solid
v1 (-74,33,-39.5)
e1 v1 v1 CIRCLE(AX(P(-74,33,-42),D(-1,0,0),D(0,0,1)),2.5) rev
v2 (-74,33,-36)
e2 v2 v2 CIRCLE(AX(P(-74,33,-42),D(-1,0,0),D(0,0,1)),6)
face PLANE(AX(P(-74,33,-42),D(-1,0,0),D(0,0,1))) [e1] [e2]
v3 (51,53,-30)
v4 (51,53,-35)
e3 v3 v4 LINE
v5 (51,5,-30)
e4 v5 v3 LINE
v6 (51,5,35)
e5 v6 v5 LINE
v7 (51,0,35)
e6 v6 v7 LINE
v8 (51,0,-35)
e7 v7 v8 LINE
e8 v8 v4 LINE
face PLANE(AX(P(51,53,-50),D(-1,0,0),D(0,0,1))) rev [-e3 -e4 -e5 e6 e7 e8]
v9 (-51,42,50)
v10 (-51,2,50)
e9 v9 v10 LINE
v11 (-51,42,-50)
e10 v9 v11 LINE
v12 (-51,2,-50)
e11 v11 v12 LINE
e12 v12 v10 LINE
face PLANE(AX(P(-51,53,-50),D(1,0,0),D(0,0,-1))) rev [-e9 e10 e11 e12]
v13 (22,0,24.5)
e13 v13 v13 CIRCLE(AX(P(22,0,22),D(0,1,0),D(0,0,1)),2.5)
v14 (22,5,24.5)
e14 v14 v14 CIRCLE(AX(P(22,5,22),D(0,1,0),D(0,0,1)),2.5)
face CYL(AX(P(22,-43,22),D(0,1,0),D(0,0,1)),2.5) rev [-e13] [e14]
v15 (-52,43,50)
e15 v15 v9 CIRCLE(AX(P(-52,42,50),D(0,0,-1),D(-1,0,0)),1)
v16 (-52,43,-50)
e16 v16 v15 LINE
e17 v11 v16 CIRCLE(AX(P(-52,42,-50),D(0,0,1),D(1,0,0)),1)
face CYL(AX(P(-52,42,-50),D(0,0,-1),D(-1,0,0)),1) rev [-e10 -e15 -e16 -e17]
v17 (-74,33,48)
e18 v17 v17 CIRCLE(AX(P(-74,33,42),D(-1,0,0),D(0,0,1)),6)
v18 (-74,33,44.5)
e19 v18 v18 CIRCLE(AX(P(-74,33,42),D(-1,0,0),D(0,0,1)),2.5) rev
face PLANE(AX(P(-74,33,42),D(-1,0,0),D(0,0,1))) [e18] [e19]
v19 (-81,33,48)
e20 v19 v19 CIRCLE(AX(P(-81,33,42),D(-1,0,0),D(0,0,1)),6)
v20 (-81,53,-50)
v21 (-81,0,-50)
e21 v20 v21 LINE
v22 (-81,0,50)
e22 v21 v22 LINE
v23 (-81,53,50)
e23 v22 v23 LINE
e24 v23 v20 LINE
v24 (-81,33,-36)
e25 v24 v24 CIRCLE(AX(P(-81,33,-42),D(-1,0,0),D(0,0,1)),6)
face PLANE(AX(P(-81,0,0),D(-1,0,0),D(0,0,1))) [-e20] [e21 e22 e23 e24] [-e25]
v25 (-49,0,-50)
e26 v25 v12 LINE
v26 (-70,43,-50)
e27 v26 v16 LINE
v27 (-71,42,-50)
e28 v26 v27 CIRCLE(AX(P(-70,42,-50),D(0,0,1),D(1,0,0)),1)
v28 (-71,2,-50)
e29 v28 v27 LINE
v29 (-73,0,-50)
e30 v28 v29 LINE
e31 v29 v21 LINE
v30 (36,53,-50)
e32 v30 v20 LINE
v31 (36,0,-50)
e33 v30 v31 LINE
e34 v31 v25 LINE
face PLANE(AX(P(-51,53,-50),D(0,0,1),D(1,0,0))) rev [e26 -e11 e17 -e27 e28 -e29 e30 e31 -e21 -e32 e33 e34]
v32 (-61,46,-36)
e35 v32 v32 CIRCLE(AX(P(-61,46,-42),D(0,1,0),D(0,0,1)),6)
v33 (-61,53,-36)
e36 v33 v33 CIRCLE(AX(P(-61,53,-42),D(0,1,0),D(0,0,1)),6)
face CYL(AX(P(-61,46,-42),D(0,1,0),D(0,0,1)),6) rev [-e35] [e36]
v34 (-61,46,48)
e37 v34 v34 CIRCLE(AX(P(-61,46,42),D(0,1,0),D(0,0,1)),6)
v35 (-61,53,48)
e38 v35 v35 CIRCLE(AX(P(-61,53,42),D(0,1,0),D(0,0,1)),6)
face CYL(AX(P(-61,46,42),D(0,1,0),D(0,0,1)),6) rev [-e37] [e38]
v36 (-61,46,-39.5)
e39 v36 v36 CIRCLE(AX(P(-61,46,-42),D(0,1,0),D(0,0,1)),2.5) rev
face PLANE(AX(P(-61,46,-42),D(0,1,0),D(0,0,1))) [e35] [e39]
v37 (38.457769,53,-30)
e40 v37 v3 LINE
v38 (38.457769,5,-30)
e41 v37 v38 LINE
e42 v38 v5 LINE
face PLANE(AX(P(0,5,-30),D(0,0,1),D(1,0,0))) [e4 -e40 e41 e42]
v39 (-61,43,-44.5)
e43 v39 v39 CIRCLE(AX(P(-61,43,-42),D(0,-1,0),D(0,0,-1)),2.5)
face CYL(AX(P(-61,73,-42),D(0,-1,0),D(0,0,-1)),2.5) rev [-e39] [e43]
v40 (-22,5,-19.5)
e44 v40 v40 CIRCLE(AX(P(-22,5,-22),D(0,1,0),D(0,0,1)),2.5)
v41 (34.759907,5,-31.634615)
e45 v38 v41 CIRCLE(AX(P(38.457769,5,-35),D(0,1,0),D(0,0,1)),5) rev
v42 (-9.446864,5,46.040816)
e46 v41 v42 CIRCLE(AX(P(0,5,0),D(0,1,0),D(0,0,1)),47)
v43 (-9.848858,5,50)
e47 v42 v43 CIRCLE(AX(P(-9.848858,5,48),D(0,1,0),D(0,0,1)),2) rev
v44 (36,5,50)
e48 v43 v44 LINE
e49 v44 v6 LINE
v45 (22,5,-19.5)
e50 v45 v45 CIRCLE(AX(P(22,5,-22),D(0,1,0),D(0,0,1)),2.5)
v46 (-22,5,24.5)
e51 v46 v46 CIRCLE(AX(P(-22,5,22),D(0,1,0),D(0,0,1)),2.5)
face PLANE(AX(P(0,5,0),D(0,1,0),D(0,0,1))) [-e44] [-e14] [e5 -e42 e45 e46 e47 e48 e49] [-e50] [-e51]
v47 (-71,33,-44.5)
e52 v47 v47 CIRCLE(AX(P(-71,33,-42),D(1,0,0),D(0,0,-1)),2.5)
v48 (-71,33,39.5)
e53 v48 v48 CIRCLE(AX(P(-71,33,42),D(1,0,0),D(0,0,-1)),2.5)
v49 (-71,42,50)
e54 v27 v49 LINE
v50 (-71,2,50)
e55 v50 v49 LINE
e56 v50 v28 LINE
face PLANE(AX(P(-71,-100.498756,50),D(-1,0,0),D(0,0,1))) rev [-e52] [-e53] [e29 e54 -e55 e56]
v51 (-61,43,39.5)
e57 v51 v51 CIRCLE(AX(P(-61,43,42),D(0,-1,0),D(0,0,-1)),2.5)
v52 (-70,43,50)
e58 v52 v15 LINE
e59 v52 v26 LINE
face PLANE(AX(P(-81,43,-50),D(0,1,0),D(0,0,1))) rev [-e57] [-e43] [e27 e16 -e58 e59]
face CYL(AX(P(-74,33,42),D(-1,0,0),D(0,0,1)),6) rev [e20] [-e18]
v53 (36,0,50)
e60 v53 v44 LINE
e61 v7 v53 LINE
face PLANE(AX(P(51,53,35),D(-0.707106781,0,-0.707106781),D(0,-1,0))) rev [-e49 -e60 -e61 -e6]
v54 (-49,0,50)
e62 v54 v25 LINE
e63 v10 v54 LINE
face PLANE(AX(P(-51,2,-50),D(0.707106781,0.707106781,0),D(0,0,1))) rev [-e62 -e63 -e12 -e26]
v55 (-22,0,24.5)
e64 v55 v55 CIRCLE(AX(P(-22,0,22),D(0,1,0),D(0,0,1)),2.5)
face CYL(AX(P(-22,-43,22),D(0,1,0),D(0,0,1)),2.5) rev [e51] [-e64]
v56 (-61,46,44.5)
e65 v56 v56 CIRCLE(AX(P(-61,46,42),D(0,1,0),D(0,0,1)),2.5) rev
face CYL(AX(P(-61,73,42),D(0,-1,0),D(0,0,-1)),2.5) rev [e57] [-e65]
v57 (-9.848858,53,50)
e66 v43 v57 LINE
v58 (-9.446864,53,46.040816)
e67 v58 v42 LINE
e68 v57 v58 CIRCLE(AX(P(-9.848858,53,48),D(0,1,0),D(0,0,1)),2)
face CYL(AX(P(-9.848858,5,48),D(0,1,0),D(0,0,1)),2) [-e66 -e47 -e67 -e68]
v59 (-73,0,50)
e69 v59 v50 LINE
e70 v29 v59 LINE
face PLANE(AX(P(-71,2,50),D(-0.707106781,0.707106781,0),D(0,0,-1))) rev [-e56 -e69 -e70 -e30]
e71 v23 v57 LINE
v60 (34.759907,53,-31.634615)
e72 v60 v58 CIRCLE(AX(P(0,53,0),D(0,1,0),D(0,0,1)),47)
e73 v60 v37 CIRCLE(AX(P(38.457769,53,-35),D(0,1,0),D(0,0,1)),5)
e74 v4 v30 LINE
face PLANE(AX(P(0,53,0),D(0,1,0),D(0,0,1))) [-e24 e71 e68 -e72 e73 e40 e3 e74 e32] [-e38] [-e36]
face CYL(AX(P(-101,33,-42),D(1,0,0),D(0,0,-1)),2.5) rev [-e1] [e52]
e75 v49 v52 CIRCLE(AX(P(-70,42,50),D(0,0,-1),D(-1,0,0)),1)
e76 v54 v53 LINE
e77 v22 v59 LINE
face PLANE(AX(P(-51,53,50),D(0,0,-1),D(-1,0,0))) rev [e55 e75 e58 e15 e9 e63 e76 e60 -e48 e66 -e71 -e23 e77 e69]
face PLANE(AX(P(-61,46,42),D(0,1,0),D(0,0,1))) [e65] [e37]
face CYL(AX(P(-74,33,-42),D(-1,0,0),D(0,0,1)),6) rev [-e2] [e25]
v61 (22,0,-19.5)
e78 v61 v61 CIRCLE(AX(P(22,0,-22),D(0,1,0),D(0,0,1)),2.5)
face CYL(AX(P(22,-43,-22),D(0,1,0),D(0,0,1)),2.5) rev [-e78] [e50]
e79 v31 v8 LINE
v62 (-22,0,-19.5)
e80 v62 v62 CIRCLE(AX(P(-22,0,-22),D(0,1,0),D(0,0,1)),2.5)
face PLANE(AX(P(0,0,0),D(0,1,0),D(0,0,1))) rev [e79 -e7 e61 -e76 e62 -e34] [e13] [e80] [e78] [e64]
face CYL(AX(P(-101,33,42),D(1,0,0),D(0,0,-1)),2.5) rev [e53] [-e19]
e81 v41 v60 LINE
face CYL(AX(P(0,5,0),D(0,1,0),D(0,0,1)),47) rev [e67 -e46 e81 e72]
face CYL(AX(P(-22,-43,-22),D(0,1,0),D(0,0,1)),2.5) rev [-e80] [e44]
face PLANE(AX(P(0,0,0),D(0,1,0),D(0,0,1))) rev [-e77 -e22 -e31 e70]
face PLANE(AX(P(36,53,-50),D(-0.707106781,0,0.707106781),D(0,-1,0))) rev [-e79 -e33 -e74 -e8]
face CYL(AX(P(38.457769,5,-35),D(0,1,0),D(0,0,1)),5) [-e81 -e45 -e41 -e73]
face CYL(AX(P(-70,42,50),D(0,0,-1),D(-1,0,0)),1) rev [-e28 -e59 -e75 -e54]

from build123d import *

# Parameters (mm, degrees)
SKETCH_1_W          = 102
SKETCH_1_H          = 100
EXTRUDE_1_DEPTH     = 53
CUT_EXTRUDE_1_DEPTH = 48
SKETCH_3_W          = 51
SKETCH_3_H          = 50
CUT_EXTRUDE_2_DEPTH = 48
CUT_EXTRUDE_3_DEPTH = 48
CHAMFER_1_SIZE      = 15
FILLET_2_R          = 5
SKETCH_5_W          = 100
SKETCH_5_H          = 10
EXTRUDE_2_DEPTH     = 30
SKETCH_6_W          = 10
SKETCH_6_H          = 100
EXTRUDE_3_DEPTH     = 43
FILLET_START        = 5
FILLET_5_DEPTH      = 49
SKETCH_8_R          = 2.5
CUT_EXTRUDE_4_DEPTH = 30
SKETCH_9_R          = 6
CUT_EXTRUDE_5_DEPTH = 7
SKETCH_10_R         = 2.5
CUT_EXTRUDE_6_DEPTH = 30
SKETCH_11_R         = 6
CUT_EXTRUDE_7_DEPTH = 7
CHAMFER_2_SIZE      = 2
FILLET_7_R          = 1


with BuildPart() as part:
    # 草图1 → 凸台-拉伸1 (new body)
    with BuildSketch(Plane(origin=(0, 0, 0), x_dir=(1, 0, 0), z_dir=(0, 1, 0))):
        Rectangle(SKETCH_1_W, SKETCH_1_H)
    extrude(amount=EXTRUDE_1_DEPTH)

    # 草图2 → 切除-拉伸1 (cut)
    with BuildSketch(Plane(origin=(0, 53, 0), x_dir=(1, 0, 0), z_dir=(0, 1, 0))):
        with BuildLine():
            Line((23, -30), (23, 30))
            Line((23, 30), (36.18010503, 30))
            ThreePointArc((36.18010503, 30), (-47, 0), (36.18010503, -30))
            Line((36.18010503, -30), (23, -30))
        make_face()
        with BuildLine():
            Line((36.18010503, 30), (23, 30))
            Line((23, 30), (23, -30))
            Line((23, -30), (36.18010503, -30))
            ThreePointArc((36.18010503, -30), (44.21235651, -15.94576846), (47, 0))
            ThreePointArc((47, 0), (44.21235651, 15.94576846), (36.18010503, 30))
        make_face()
        with BuildLine():
            Line((51, 30), (36.18010503, 30))
            ThreePointArc((36.18010503, 30), (44.21235651, 15.94576846), (47, 0))
            ThreePointArc((47, 0), (44.21235651, -15.94576846), (36.18010503, -30))
            Line((36.18010503, -30), (51, -30))
            Line((51, -30), (51, 30))
        make_face()
    extrude(amount=-CUT_EXTRUDE_1_DEPTH, mode=Mode.SUBTRACT)

    # 草图3 → 切除-拉伸2 (cut)
    with BuildSketch(Plane(origin=(0, 53, 0), x_dir=(1, 0, 0), z_dir=(0, 1, 0))):
        with Locations((25.5, -25)):
            Rectangle(SKETCH_3_W, SKETCH_3_H)
    extrude(amount=-CUT_EXTRUDE_2_DEPTH, mode=Mode.SUBTRACT)

    # 草图4 → 切除-拉伸3 (cut)
    with BuildSketch(Plane(origin=(0, 5, 0), x_dir=(1, 0, 0), z_dir=(0, 1, 0))):
        with BuildLine():
            ThreePointArc((24.5, 22), (22, 24.5), (19.5, 22))
            Line((19.5, 22), (22, 22))
            Line((22, 22), (22, 19.5))
            ThreePointArc((22, 19.5), (23.767766953, 20.232233047), (24.5, 22))
        make_face()
        with BuildLine():
            Line((22, 22), (19.5, 22))
            ThreePointArc((19.5, 22), (20.232233047, 20.232233047), (22, 19.5))
            Line((22, 19.5), (22, 22))
        make_face()
        with BuildLine():
            Line((-22, 19.5), (-22, 22))
            Line((-22, 22), (-19.5, 22))
            ThreePointArc((-19.5, 22), (-23.767766953, 23.767766953), (-22, 19.5))
        make_face()
        with BuildLine():
            Line((-19.5, 22), (-22, 22))
            Line((-22, 22), (-22, 19.5))
            ThreePointArc((-22, 19.5), (-20.232233047, 20.232233047), (-19.5, 22))
        make_face()
        with BuildLine():
            ThreePointArc((-19.5, -22), (-20.232233047, -20.232233047), (-22, -19.5))
            Line((-22, -19.5), (-22, -22))
            Line((-22, -22), (-19.5, -22))
        make_face()
        with BuildLine():
            Line((-22, -22), (-22, -19.5))
            ThreePointArc((-22, -19.5), (-23.767766953, -23.767766953), (-19.5, -22))
            Line((-19.5, -22), (-22, -22))
        make_face()
        with BuildLine():
            ThreePointArc((24.5, -22), (23.767766953, -20.232233047), (22, -19.5))
            Line((22, -19.5), (22, -22))
            Line((22, -22), (19.5, -22))
            ThreePointArc((19.5, -22), (22, -24.5), (24.5, -22))
        make_face()
        with BuildLine():
            Line((22, -22), (22, -19.5))
            ThreePointArc((22, -19.5), (20.232233047, -20.232233047), (19.5, -22))
            Line((19.5, -22), (22, -22))
        make_face()
    extrude(amount=-CUT_EXTRUDE_3_DEPTH, mode=Mode.SUBTRACT)

    # 倒角1
    chamfer_1_edges = [part.edges().sort_by_distance(p)[0] for p in [
        (51, 2.5, 50),
        (51, 26.5, -50),
    ]]
    chamfer(chamfer_1_edges, length=CHAMFER_1_SIZE)

    # 圆角2
    # the kernel refuses this fillet: 5 mm, written as the material it takes off along each edge
    with BuildSketch(Plane(origin=(0, 5, 47), x_dir=(-0.9989898744385596, 0, -0.0449358517136451), z_dir=(0, 1, 0))) as fillet_2_piece_1:
        with BuildLine():
            CenterArc((4.44864932, 4.994949372), FILLET_2_R, 203.55292178, 63.871576317)
            Line((-0.134807555, 2.996969623), (0, 0))
            ThreePointArc((0, 0), (2.111985031, 0.047475901), (4.223970061, 0))
        make_face()
    extrude(amount=58.559925153, mode=Mode.SUBTRACT)
    with BuildSketch(Plane(origin=(36.18010503, 58.69416004, -30), x_dir=(1, 0, 0), z_dir=(0, -1, 0))) as fillet_2_piece_2:
        with BuildLine():
            CenterArc((2.277664016, -5), FILLET_2_R, 90, 47.695010293)
            ThreePointArc((-1.420198392, -1.634615385), (-0.700684154, -0.825487738), (0, 0))
            Line((0, 0), (2.277664016, 0))
        make_face()
    extrude(amount=53.69416004, mode=Mode.SUBTRACT)

    # 草图5 → 凸台-拉伸2 (add)
    with BuildSketch(Plane.ZY.offset(51)):
        with Locations((0, 48)):
            Rectangle(SKETCH_5_W, SKETCH_5_H)
    extrude(amount=EXTRUDE_2_DEPTH)

    # 草图6 → 凸台-拉伸3 (add)
    with BuildSketch(Plane.XZ.offset(-43)):
        with Locations((-76, 0)):
            Rectangle(SKETCH_6_W, SKETCH_6_H)
    extrude(amount=EXTRUDE_3_DEPTH)

    # 圆角5: read off the stored shape, not the designer's step
    # 圆角5 outline → 圆角5 (cut)
    with BuildSketch(Plane(origin=(0, 0, 0), x_dir=(1, 0, 0), z_dir=(0, 1, 0)).offset(FILLET_START)):
        with BuildLine():
            ThreePointArc((-9.446863606, -46.040816327), (-7.859088048, -48.202030509), (-9.848857802, -50))
            Line((-9.848857802, -50), (0, -50))
            ThreePointArc((0, -50), (-1.653487381, -47.801385193), (-4.219703321, -46.810192308))
            ThreePointArc((-4.219703321, -46.810192308), (-6.844103136, -46.499013455), (-9.446863606, -46.040816327))
        make_face()
    extrude(amount=FILLET_5_DEPTH, mode=Mode.SUBTRACT)

    # 草图8 → 切除-拉伸4 (cut)
    with BuildSketch(Plane.XZ.offset(-43)):
        with Locations(Location((-61, 42, 0), (0, 0, 270))):
            Circle(SKETCH_8_R)
        with Locations(Location((-61, -42, 0), (0, 0, 270))):
            Circle(SKETCH_8_R)
    extrude(amount=-CUT_EXTRUDE_4_DEPTH, mode=Mode.SUBTRACT)

    # 草图9 → 切除-拉伸5 (cut)
    with BuildSketch(Plane(origin=(0, 53, 0), x_dir=(1, 0, 0), z_dir=(0, 1, 0))):
        with Locations(Location((-61, 42, 0), (0, 0, 270))):
            Circle(SKETCH_9_R)
        with Locations(Location((-61, -42, 0), (0, 0, 270))):
            Circle(SKETCH_9_R)
    extrude(amount=-CUT_EXTRUDE_5_DEPTH, mode=Mode.SUBTRACT)

    # 草图10 → 切除-拉伸6 (cut)
    with BuildSketch(Plane(origin=(-71, 0, 0), x_dir=(0, 0, -1), z_dir=(1, 0, 0))):
        with Locations((-42, 33)):
            Circle(SKETCH_10_R)
        with Locations((42, 33)):
            Circle(SKETCH_10_R)
    extrude(amount=-CUT_EXTRUDE_6_DEPTH, mode=Mode.SUBTRACT)

    # 草图11 → 切除-拉伸7 (cut)
    with BuildSketch(Plane.ZY.offset(81)):
        with Locations((-42, 33)):
            Circle(SKETCH_11_R)
        with Locations((42, 33)):
            Circle(SKETCH_11_R)
    extrude(amount=-CUT_EXTRUDE_7_DEPTH, mode=Mode.SUBTRACT)

    # 倒角2
    chamfer_2_edges = [part.edges().sort_by_distance(p)[0] for p in [
        (-71, 0, 0),
        (-51, 0, 0),
    ]]
    chamfer(chamfer_2_edges, length=CHAMFER_2_SIZE)

    # 圆角7
    fillet_7_edges = [part.edges().sort_by_distance(p)[0] for p in [
        (-51, 43, 0),
        (-71, 43, 0),
    ]]
    fillet(fillet_7_edges, radius=FILLET_7_R)


solid = part.part
